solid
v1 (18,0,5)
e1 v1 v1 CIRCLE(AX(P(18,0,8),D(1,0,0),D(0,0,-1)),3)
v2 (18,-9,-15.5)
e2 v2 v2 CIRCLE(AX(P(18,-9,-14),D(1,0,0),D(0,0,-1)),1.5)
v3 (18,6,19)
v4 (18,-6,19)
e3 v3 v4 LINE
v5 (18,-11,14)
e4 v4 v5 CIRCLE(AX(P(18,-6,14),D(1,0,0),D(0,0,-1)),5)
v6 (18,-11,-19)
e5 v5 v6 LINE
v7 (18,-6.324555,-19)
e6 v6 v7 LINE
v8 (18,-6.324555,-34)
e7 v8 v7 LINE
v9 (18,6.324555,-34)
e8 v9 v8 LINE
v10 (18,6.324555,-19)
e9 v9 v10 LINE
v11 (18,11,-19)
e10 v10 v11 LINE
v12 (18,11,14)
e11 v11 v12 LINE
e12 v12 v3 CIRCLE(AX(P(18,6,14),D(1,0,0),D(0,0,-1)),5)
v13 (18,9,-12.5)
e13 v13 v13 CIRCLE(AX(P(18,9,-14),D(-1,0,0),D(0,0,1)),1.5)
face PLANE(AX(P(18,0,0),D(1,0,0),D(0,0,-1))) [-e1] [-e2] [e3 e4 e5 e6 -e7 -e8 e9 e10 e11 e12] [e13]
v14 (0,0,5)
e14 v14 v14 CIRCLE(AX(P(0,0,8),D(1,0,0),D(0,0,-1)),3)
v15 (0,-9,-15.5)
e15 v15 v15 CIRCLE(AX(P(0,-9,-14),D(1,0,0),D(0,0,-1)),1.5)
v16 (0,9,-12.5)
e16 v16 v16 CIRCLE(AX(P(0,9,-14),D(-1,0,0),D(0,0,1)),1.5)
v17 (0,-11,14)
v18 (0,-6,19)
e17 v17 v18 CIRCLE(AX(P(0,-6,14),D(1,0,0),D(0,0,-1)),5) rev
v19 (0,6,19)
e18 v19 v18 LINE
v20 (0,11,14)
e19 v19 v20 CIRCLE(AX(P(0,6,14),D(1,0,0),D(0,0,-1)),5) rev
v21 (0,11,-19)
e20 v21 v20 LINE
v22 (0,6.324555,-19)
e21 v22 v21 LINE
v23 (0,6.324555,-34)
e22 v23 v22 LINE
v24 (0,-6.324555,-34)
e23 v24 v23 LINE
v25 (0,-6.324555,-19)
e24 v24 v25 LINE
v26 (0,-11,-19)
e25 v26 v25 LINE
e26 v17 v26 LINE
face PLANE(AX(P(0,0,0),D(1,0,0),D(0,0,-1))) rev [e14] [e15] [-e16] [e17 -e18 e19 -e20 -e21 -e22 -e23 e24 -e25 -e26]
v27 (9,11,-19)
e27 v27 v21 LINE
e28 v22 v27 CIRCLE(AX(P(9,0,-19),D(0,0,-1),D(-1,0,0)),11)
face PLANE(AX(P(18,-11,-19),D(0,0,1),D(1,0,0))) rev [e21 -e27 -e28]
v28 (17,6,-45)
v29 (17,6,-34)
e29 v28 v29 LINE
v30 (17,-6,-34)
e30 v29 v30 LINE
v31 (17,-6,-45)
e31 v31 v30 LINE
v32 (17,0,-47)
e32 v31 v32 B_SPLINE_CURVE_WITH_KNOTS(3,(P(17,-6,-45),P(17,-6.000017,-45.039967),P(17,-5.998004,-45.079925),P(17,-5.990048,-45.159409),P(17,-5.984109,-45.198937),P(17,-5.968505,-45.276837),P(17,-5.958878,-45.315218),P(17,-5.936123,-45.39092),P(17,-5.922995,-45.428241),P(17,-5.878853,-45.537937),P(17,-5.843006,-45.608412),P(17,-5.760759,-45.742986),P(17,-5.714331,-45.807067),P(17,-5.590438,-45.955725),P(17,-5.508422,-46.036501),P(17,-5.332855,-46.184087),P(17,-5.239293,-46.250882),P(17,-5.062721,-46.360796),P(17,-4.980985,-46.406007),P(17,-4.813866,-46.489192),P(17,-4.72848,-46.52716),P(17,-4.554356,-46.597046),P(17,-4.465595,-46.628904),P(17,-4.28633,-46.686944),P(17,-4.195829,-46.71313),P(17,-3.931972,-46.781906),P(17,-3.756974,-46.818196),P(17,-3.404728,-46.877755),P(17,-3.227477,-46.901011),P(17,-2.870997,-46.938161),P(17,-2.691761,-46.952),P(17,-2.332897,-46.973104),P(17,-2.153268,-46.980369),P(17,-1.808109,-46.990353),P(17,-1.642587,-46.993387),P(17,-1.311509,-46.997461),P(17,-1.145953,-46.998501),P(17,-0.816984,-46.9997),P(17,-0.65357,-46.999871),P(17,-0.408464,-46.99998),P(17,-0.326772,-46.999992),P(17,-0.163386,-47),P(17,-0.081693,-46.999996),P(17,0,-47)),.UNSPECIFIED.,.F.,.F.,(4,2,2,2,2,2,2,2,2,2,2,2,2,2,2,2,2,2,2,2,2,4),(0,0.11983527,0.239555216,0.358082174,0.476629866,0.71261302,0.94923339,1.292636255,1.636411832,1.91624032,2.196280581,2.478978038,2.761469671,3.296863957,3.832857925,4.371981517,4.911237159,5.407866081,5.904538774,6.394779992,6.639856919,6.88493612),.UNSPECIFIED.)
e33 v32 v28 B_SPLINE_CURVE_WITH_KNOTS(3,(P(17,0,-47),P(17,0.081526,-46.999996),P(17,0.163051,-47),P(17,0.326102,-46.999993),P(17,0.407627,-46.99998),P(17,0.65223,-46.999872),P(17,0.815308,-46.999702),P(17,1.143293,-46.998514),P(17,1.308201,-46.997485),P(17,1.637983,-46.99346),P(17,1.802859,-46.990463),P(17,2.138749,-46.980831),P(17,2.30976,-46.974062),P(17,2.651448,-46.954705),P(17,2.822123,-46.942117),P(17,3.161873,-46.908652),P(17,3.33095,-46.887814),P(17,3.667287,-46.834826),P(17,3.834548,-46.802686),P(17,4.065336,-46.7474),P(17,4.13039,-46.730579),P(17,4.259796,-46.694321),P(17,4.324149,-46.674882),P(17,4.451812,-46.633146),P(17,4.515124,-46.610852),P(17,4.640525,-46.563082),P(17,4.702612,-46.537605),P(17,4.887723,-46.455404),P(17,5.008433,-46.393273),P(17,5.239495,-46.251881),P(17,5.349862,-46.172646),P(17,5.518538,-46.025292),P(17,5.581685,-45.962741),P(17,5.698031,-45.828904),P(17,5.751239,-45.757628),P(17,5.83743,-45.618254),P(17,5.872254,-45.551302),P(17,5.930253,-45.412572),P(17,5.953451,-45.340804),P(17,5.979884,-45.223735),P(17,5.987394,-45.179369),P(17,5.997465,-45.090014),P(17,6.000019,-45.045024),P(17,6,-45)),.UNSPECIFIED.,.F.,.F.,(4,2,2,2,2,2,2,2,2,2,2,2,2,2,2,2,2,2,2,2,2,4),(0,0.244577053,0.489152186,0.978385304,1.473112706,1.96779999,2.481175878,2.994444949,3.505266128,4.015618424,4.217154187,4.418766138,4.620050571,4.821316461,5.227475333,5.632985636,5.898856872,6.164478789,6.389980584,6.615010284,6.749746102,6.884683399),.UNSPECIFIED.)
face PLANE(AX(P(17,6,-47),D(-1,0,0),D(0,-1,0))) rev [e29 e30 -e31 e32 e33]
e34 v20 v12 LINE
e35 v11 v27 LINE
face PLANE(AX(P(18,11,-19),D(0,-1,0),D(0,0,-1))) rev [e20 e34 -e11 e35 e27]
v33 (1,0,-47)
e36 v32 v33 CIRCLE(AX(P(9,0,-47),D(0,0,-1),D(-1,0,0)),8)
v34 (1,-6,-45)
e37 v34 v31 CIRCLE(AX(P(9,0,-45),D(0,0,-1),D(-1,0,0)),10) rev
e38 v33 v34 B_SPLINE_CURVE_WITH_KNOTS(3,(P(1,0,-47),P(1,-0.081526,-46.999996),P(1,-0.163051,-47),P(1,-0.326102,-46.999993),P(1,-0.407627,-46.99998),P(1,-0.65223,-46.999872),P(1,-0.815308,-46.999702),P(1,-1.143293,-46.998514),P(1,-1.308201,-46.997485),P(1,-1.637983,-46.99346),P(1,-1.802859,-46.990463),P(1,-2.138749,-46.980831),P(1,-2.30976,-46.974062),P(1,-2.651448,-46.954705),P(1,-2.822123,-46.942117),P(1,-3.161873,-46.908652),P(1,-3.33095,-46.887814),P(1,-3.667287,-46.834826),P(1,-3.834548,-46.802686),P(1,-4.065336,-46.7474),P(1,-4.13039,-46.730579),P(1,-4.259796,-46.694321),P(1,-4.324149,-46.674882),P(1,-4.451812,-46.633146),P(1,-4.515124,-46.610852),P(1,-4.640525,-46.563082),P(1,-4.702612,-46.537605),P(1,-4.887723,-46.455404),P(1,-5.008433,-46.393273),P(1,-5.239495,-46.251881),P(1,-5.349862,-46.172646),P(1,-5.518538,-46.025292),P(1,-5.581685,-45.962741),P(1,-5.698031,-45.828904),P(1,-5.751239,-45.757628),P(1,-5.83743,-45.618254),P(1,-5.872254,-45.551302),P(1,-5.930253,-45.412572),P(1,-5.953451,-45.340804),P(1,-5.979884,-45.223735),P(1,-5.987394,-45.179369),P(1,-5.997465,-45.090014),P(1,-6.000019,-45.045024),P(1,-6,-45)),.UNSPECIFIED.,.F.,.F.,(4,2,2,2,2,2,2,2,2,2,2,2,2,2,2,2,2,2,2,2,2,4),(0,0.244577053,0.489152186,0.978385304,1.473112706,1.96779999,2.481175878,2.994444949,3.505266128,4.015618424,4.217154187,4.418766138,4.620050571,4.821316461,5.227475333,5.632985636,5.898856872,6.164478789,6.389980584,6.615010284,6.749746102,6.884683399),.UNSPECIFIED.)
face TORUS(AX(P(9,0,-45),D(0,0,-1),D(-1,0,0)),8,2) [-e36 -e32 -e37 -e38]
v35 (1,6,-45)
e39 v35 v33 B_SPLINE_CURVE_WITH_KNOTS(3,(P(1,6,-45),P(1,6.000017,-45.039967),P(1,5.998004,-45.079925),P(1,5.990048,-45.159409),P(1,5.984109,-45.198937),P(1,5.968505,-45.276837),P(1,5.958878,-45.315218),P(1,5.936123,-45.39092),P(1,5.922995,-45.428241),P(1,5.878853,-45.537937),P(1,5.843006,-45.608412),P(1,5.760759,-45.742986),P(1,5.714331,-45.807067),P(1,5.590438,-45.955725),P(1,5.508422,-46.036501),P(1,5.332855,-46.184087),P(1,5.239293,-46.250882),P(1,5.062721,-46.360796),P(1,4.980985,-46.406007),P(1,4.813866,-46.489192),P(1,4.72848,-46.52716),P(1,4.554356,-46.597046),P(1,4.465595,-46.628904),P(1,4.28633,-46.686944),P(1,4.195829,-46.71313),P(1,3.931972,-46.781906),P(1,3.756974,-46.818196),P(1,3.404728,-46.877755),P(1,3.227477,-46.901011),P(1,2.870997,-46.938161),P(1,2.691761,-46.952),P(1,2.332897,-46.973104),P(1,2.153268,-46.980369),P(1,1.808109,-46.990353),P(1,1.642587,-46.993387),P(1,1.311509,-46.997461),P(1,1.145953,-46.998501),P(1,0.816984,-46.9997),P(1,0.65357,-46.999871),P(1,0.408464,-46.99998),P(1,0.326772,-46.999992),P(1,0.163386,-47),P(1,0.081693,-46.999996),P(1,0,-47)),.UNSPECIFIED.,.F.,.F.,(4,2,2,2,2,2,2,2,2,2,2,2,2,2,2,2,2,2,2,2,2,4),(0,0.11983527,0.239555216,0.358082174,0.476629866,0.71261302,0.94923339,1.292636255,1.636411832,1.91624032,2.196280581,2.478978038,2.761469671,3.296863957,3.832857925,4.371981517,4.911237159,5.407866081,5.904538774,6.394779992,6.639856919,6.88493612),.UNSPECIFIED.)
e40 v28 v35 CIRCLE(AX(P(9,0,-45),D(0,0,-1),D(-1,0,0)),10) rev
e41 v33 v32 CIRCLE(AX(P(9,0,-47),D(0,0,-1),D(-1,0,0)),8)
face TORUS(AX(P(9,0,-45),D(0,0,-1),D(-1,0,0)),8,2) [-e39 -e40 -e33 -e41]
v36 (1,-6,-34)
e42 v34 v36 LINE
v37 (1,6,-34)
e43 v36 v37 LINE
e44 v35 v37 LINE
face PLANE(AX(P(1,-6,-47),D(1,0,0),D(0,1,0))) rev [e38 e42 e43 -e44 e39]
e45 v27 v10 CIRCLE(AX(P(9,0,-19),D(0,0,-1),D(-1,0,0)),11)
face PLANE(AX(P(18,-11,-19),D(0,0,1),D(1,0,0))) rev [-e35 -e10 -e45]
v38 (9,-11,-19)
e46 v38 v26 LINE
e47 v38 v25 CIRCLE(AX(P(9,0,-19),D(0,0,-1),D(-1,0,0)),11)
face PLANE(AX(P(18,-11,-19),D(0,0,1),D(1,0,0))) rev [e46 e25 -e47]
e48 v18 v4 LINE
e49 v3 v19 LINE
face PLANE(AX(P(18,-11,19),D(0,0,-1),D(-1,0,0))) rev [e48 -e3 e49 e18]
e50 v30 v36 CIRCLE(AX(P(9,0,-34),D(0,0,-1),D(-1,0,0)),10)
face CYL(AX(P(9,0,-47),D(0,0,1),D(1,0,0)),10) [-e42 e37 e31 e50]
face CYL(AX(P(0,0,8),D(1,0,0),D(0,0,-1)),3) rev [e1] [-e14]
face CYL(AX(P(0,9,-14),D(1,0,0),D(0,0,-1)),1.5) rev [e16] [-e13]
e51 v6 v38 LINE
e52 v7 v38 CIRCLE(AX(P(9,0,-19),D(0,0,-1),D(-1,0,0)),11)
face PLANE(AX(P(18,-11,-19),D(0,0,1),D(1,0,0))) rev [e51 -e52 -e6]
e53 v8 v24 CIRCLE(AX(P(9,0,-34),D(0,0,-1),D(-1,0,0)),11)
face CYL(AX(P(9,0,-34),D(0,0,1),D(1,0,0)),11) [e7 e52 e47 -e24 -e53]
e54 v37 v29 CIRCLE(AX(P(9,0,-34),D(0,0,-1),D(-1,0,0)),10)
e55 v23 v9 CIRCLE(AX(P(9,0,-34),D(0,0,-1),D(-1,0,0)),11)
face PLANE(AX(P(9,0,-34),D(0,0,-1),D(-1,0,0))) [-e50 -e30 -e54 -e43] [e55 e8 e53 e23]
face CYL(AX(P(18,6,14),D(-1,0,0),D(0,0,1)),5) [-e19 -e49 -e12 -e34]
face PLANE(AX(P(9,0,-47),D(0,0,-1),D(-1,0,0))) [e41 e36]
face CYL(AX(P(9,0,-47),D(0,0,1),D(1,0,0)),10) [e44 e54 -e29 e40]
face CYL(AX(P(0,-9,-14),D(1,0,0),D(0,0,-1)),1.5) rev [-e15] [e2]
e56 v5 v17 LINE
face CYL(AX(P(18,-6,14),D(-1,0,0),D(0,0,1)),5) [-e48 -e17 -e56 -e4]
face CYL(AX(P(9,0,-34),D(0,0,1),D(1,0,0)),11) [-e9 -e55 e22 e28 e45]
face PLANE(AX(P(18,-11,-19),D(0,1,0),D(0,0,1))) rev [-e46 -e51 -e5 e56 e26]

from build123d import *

# Parameters (mm, degrees)
SKETCH1_W           = 38
SKETCH1_H           = 22
BOSS_EXTRUDE1_DEPTH = 18
FILLET1_R           = 5
BOSS_EXTRUDE2_DEPTH = 15
BOSS_EXTRUDE3_DEPTH = 13
FILLET2_R           = 2
SKETCH5_R           = 3
SKETCH5_R_2         = 1.5
CUT_EXTRUDE1_DEPTH  = 52.516987581


with BuildPart() as part:
    # Sketch1 → Boss-Extrude1 (new body)
    with BuildSketch(Plane(origin=(0, 0, 0), x_dir=(0, 0, -1), z_dir=(1, 0, 0))):
        Rectangle(SKETCH1_W, SKETCH1_H)
    extrude(amount=BOSS_EXTRUDE1_DEPTH)

    # Fillet1
    fillet1_edges = [part.edges().sort_by_distance(p)[0] for p in [
        (9, 11, 19),
        (9, -11, 19),
    ]]
    fillet(fillet1_edges, radius=FILLET1_R)

    # Sketch3 → Boss-Extrude2 (add)
    with BuildSketch(Plane(origin=(0, 0, -19), x_dir=(-1, 0, 0), z_dir=(0, 0, -1))):
        with BuildLine():
            Line((-18, 6.32455532), (-18, -6.32455532))
            ThreePointArc((-18, -6.32455532), (-9, -11), (0, -6.32455532))
            Line((0, -6.32455532), (0, 6.32455532))
            ThreePointArc((0, 6.32455532), (-9, 11), (-18, 6.32455532))
        make_face()
    extrude(amount=BOSS_EXTRUDE2_DEPTH)

    # Sketch4 → Boss-Extrude3 (add)
    with BuildSketch(Plane(origin=(0, 0, -34), x_dir=(-1, 0, 0), z_dir=(0, 0, -1))):
        with BuildLine():
            Line((-17, 6), (-17, -6))
            ThreePointArc((-17, -6), (-9, -10), (-1, -6))
            Line((-1, -6), (-1, 6))
            ThreePointArc((-1, 6), (-9, 10), (-17, 6))
        make_face()
    extrude(amount=BOSS_EXTRUDE3_DEPTH)

    # Fillet2
    fillet2_edges = [part.edges().sort_by_distance(p)[0] for p in [
        (9, 10, -47),
        (9, -10, -47),
    ]]
    fillet(fillet2_edges, radius=FILLET2_R - 0.0001)  # a hair under: the kernel refuses the full size

    # Sketch5 → Cut-Extrude1 (cut, through all)
    with BuildSketch(Plane(origin=(18, 0, 0), x_dir=(0, 0, -1), z_dir=(1, 0, 0))):
        with Locations((-8, 0)):
            Circle(SKETCH5_R)
        with Locations((14, -9)):
            Circle(SKETCH5_R_2)
        with Locations(Location((14, 9, 0), (0, 0, 180))):
            Circle(SKETCH5_R_2)
    extrude(amount=-CUT_EXTRUDE1_DEPTH, mode=Mode.SUBTRACT)


solid = part.part
